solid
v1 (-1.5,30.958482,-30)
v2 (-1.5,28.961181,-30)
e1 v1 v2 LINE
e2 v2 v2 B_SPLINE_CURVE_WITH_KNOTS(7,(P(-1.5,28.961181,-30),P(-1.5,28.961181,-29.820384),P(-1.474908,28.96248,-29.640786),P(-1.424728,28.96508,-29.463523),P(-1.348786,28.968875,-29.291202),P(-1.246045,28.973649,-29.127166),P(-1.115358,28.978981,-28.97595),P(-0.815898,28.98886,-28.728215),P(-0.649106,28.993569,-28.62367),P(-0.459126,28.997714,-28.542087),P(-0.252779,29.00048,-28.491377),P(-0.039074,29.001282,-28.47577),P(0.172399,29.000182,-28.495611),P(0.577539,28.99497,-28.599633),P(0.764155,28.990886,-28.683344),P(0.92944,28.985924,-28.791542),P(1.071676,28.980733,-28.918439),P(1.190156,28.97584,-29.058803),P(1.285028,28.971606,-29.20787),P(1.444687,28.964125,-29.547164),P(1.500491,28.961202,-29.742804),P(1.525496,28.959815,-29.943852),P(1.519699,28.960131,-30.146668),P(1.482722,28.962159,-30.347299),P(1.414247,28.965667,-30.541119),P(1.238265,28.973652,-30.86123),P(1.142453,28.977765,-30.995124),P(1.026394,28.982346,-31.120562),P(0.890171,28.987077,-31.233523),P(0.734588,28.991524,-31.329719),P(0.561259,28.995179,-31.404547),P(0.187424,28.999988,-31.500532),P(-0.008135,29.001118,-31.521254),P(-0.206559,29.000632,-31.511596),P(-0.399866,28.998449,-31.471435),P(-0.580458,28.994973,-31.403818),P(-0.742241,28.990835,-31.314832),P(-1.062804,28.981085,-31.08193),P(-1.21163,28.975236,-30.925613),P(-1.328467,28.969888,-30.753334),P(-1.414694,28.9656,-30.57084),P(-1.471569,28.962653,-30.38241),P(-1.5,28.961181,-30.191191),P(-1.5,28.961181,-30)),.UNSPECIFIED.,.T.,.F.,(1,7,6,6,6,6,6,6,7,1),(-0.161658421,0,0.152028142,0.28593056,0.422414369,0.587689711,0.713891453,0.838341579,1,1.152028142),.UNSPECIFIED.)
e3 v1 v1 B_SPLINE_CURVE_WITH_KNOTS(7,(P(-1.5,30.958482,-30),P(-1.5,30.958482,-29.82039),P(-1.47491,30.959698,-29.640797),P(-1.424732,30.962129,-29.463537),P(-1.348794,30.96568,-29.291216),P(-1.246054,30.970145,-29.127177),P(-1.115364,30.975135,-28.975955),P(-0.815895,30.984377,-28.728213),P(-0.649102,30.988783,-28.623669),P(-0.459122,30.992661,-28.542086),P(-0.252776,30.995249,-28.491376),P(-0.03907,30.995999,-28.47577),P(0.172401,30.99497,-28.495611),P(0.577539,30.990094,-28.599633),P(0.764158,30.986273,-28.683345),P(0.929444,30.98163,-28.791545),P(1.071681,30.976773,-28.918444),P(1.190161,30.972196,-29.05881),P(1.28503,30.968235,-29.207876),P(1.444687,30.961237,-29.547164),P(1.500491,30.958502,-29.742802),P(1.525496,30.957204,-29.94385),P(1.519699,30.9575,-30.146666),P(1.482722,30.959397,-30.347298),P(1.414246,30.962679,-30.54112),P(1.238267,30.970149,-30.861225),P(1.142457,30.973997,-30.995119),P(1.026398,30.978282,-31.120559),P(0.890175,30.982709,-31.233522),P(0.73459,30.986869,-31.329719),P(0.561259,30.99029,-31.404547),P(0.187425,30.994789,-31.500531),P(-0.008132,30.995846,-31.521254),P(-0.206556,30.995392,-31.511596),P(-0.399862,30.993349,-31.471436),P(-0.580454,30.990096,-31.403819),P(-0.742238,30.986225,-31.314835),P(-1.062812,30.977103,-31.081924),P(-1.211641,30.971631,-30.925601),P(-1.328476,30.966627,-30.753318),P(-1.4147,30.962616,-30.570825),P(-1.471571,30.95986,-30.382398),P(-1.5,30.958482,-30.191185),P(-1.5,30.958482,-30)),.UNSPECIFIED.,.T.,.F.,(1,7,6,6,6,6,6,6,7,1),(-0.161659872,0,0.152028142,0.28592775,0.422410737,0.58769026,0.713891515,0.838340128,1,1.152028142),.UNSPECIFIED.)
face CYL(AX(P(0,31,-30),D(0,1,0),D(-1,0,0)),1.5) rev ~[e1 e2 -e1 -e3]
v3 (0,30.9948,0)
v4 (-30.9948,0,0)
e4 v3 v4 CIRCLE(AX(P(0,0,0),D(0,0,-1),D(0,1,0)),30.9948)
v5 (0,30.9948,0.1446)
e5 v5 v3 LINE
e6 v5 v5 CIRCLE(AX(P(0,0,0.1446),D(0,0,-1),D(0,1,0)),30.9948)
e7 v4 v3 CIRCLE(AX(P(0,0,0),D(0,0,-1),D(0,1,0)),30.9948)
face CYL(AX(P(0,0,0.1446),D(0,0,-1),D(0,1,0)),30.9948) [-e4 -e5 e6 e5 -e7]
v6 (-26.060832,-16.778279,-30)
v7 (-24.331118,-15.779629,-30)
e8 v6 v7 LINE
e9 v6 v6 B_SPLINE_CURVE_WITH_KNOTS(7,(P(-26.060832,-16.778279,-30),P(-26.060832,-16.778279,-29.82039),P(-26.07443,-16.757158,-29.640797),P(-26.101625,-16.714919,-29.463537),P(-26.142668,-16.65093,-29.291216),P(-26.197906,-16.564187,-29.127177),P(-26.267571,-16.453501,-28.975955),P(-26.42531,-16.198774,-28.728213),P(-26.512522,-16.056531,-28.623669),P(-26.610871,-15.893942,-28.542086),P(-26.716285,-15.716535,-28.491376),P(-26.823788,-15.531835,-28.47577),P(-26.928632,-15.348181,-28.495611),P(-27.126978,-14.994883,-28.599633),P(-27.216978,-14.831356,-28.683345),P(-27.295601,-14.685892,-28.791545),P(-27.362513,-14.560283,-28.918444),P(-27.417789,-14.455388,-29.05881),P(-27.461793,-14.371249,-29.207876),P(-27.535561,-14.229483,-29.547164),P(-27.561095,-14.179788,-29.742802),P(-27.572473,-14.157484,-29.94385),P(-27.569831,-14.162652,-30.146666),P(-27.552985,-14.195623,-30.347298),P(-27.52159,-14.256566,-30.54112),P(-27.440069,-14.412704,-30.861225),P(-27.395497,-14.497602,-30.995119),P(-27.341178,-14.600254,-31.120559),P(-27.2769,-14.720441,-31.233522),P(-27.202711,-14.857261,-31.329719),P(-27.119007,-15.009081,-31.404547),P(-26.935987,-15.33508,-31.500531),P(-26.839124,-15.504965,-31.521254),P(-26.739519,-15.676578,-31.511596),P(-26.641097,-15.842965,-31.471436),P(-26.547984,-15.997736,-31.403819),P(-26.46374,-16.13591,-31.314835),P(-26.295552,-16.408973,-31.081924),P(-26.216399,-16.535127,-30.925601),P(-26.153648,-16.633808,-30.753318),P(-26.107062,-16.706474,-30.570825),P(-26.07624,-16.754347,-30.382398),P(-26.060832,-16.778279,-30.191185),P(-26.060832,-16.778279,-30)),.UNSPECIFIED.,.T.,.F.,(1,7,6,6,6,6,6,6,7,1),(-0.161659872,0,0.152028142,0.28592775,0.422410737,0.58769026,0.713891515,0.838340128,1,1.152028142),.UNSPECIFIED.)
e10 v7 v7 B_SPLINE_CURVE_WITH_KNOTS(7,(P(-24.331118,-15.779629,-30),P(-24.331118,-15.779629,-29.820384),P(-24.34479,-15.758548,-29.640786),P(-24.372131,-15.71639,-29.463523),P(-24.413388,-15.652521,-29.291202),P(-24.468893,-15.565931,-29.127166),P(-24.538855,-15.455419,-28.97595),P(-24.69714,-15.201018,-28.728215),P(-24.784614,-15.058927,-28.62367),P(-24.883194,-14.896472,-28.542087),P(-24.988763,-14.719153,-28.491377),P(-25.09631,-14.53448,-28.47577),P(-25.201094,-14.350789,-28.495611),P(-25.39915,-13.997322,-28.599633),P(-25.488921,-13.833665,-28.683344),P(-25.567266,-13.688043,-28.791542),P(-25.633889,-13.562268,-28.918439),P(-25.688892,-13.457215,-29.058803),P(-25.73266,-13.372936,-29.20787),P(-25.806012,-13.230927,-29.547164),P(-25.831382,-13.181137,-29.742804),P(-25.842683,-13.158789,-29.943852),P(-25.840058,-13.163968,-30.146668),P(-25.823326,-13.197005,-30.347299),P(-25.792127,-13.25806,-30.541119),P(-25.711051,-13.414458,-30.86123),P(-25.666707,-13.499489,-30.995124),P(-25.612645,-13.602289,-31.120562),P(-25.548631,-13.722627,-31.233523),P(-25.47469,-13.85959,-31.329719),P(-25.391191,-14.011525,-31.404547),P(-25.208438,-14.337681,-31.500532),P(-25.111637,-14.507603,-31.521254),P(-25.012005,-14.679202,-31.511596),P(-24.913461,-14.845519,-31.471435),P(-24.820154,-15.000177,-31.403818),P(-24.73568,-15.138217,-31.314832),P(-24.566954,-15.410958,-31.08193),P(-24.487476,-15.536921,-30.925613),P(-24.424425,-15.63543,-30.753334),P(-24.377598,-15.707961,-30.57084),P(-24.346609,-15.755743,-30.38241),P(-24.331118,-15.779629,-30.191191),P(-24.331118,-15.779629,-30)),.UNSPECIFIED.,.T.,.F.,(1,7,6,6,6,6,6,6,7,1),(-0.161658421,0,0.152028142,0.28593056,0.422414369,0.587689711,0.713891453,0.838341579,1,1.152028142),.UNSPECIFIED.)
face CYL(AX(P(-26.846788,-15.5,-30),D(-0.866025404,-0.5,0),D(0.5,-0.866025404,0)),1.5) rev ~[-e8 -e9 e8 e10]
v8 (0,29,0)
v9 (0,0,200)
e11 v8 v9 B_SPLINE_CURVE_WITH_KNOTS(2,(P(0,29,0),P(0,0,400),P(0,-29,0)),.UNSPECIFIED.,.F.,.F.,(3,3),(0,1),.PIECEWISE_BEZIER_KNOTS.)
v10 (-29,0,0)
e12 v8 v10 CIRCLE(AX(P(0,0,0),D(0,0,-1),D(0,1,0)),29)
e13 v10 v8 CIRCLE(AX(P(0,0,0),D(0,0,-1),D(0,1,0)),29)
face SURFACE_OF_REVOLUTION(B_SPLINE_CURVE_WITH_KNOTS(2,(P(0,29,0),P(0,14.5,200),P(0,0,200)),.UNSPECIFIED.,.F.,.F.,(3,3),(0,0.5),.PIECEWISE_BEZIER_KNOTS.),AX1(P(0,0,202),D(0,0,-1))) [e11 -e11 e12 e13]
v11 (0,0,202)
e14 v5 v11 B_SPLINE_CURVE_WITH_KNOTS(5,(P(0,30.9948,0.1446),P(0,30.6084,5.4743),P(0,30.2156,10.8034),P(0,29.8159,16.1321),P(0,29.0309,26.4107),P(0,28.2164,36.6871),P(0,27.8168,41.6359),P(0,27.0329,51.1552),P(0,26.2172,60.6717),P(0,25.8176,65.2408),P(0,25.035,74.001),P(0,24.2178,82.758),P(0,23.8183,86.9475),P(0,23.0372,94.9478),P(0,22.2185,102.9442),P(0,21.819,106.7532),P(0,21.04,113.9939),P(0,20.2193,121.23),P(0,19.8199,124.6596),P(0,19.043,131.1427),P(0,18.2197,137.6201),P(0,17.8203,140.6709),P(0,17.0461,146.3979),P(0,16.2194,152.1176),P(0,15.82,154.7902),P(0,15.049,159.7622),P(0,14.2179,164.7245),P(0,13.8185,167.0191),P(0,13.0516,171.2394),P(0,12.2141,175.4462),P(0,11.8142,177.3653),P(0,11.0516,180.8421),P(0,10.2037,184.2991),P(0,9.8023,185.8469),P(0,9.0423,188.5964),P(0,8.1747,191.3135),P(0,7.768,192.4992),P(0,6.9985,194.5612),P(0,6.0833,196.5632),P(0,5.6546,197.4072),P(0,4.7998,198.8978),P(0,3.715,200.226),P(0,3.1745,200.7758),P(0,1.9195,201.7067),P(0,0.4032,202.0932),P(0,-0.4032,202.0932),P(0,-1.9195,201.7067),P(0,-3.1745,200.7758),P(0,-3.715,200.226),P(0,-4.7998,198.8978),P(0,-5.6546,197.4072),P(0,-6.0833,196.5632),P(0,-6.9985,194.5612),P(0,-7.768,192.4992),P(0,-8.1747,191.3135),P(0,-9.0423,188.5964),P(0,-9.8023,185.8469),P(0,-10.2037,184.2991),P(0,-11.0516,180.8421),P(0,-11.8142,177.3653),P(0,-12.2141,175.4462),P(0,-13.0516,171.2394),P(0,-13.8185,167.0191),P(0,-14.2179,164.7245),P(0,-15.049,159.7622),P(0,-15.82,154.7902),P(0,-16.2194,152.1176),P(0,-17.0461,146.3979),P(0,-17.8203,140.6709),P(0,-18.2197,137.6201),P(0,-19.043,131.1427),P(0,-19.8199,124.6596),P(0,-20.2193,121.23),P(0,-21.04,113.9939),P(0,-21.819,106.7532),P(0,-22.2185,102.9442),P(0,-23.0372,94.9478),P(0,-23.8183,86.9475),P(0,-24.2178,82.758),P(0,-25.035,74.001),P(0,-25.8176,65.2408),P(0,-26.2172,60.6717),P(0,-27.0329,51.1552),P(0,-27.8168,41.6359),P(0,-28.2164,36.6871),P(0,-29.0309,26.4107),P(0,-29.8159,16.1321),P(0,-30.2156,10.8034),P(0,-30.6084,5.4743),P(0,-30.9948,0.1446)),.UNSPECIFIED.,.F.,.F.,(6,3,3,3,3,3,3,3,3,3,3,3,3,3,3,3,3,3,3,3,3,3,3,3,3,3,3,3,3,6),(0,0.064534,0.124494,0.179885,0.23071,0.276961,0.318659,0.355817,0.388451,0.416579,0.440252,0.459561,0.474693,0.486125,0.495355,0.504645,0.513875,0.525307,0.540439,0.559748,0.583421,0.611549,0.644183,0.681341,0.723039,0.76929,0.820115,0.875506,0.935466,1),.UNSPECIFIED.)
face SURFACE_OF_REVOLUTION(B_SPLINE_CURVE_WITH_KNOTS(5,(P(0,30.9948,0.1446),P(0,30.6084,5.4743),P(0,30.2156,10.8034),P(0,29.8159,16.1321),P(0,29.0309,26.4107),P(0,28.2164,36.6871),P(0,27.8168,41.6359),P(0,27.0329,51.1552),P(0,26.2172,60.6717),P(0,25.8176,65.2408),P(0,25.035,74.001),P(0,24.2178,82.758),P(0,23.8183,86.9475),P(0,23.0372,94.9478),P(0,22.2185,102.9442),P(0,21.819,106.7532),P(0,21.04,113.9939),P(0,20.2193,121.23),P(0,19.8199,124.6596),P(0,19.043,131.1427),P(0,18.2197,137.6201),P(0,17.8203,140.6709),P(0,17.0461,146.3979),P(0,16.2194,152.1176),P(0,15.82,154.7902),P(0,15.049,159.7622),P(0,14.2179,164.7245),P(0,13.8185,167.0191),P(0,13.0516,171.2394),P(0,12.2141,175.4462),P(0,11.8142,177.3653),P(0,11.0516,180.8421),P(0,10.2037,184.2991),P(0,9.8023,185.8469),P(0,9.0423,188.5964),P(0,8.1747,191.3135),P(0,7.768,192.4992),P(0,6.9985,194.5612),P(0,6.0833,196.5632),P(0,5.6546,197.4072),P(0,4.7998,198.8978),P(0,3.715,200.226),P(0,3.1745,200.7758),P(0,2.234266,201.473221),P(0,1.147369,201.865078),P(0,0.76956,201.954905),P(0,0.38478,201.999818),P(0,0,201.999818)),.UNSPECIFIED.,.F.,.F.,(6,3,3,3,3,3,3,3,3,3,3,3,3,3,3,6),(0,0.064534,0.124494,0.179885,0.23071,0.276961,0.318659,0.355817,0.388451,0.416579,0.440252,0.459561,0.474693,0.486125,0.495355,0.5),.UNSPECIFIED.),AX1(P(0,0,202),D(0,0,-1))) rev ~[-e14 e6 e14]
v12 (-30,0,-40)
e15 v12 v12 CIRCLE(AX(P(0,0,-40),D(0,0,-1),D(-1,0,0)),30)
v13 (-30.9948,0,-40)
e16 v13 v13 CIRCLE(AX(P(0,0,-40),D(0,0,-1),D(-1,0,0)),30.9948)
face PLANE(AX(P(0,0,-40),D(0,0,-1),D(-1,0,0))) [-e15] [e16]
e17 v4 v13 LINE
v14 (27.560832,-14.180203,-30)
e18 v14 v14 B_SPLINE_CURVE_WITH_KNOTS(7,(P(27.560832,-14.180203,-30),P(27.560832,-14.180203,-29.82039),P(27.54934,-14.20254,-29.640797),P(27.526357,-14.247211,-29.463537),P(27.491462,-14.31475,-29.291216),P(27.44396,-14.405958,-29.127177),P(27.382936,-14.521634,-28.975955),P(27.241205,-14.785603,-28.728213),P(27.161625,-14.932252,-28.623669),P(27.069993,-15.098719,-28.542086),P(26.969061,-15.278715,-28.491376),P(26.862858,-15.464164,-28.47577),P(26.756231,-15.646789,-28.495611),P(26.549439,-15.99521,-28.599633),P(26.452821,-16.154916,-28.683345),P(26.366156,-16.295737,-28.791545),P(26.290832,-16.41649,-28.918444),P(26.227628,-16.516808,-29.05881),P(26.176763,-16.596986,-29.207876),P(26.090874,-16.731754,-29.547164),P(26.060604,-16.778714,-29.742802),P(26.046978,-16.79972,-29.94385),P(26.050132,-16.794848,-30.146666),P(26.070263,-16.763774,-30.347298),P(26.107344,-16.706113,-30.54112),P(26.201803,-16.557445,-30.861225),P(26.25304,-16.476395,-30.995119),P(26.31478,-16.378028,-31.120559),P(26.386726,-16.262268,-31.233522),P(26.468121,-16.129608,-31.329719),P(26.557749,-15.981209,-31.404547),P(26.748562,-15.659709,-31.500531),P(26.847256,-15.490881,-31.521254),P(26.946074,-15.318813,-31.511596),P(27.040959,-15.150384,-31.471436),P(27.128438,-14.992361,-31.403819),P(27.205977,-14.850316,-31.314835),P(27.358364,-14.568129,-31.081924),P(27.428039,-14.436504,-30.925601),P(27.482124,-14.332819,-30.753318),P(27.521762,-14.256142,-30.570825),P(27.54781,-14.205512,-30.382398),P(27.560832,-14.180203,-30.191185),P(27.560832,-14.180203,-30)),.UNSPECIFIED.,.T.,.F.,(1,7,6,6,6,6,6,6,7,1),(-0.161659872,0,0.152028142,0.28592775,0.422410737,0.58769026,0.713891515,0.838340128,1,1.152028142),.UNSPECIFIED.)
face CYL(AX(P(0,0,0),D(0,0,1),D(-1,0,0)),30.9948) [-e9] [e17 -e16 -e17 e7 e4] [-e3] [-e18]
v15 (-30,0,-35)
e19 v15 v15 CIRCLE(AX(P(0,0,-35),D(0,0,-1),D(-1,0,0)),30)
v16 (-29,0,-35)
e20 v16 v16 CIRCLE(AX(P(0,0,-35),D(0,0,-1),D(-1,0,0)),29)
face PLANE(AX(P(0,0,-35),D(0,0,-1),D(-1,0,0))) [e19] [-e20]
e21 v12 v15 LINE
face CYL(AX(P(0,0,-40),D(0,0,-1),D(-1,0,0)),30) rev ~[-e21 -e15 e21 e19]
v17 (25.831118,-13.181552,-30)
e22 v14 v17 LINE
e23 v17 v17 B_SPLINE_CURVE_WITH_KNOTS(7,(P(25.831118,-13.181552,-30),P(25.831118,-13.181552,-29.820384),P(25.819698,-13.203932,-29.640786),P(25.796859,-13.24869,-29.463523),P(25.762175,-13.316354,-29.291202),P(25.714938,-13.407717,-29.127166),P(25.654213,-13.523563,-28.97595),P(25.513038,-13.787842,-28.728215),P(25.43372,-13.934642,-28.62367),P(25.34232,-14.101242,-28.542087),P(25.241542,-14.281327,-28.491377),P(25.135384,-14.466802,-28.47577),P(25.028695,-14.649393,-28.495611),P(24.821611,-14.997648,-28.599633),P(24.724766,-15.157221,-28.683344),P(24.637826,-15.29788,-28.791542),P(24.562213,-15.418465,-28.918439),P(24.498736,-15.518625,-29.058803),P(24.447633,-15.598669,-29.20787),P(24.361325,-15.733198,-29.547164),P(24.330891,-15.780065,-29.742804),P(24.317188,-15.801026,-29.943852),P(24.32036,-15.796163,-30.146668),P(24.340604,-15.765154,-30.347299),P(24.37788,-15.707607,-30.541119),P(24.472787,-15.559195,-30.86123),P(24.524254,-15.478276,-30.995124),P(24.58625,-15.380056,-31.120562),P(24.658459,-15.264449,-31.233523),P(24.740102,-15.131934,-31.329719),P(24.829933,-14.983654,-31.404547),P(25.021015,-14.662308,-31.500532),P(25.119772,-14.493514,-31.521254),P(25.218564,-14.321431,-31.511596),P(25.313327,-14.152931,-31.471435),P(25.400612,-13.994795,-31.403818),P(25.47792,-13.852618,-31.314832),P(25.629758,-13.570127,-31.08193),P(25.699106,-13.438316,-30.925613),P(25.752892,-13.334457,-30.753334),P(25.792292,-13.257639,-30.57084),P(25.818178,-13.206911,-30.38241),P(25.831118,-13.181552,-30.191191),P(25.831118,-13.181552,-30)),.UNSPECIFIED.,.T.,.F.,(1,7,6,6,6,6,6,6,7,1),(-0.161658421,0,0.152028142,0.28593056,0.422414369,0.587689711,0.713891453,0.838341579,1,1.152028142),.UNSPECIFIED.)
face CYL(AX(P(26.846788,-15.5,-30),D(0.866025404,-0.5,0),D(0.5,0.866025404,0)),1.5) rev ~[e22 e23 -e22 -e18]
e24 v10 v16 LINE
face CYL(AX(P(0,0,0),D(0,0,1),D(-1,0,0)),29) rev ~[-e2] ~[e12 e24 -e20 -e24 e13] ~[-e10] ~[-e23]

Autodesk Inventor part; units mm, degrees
ref_plane "YZ Plane" through (0, 0, 0) normal (1, 0, 0) x (0, 1, 0)
ref_plane "XY Plane" through (0, 0, 0) normal (0, 0, 1) x (1, 0, 0)
sketch "Skizze1" plane through (0, 0, 0) normal (1, 0, 0) x (0, 1, 0)
  line L0 (0, 2094.1927) -> (0, -1699.1575) construction
  line L1 (933.6484, 0) -> (-899.755, 0) construction
  spline S0 degree 2 poles (29, 0) (0, 400) (-29, 0) knots 0 0 0 1 1 1
  line L2 (0, 90.8614) -> (0, 0)
  line L3 (0, 0) -> (44.134, 0)
  line L4 (30.9948, 0.1446) -> (30.9948, 0)
  line L5 (-30.9948, 0.1446) -> (-30.9948, 0)
  line L6 (0, 202) -> (0, 200)
  spline S1 degree 5 poles (30.9948, 0.1446) (30.6084, 5.4743) (30.2156, 10.8034) (29.8159, 16.1321) (29.0309, 26.4107) (28.2164, 36.6871) (27.8168, 41.6359) (27.0329, 51.1552) (26.2172, 60.6717) (25.8176, 65.2408) (25.035, 74.001) (24.2178, 82.758) (23.8183, 86.9475) (23.0372, 94.9478) (22.2185, 102.9442) (21.819, 106.7532) (21.04, 113.9939) (20.2193, 121.23) (19.8199, 124.6596) (19.043, 131.1427) (18.2197, 137.6201) (17.8203, 140.6709) (17.0461, 146.3979) (16.2194, 152.1176) (15.82, 154.7902) (15.049, 159.7622) (14.2179, 164.7245) (13.8185, 167.0191) (13.0516, 171.2394) (12.2141, 175.4462) (11.8142, 177.3653) (11.0516, 180.8421) (10.2037, 184.2991) (9.8023, 185.8469) (9.0423, 188.5964) (8.1747, 191.3135) (7.768, 192.4992) (6.9985, 194.5612) (6.0833, 196.5632) (5.6546, 197.4072) (4.7998, 198.8978) (3.715, 200.226) (3.1745, 200.7758) (1.9195, 201.7067) (0.4032, 202.0932) (-0.4032, 202.0932) (-1.9195, 201.7067) (-3.1745, 200.7758) (-3.715, 200.226) (-4.7998, 198.8978) (-5.6546, 197.4072) (-6.0833, 196.5632) (-6.9985, 194.5612) (-7.768, 192.4992) (-8.1747, 191.3135) (-9.0423, 188.5964) (-9.8023, 185.8469) (-10.2037, 184.2991) (-11.0516, 180.8421) (-11.8142, 177.3653) (-12.2141, 175.4462) (-13.0516, 171.2394) (-13.8185, 167.0191) (-14.2179, 164.7245) (-15.049, 159.7622) (-15.82, 154.7902) (-16.2194, 152.1176) (-17.0461, 146.3979) (-17.8203, 140.6709) (-18.2197, 137.6201) (-19.043, 131.1427) (-19.8199, 124.6596) (-20.2193, 121.23) (-21.04, 113.9939) (-21.819, 106.7532) (-22.2185, 102.9442) (-23.0372, 94.9478) (-23.8183, 86.9475) (-24.2178, 82.758) (-25.035, 74.001) (-25.8176, 65.2408) (-26.2172, 60.6717) (-27.0329, 51.1552) (-27.8168, 41.6359) (-28.2164, 36.6871) (-29.0309, 26.4107) (-29.8159, 16.1321) (-30.2156, 10.8034) (-30.6084, 5.4743) (-30.9948, 0.1446) knots 0 0 0 0 0 0 0.064534 0.064534 0.064534 0.124494 0.124494 0.124494 0.179885 0.179885 0.179885 0.23071 0.23071 0.23071 0.276961 0.276961 0.276961 0.318659 0.318659 0.318659 0.355817 0.355817 0.355817 0.388451 0.388451 0.388451 0.416579 0.416579 0.416579 0.440252 0.440252 0.440252 0.459561 0.459561 0.459561 0.474693 0.474693 0.474693 0.486125 0.486125 0.486125 0.495355 0.495355 0.495355 0.504645 0.504645 0.504645 0.513875 0.513875 0.513875 0.525307 0.525307 0.525307 0.540439 0.540439 0.540439 0.559748 0.559748 0.559748 0.583421 0.583421 0.583421 0.611549 0.611549 0.611549 0.644183 0.644183 0.644183 0.681341 0.681341 0.681341 0.723039 0.723039 0.723039 0.76929 0.76929 0.76929 0.820115 0.820115 0.820115 0.875506 0.875506 0.875506 0.935466 0.935466 0.935466 1 1 1 1 1 1
  point P0 (0, 82)
  point P1 (0, 80)
  point P2 (29, 0)
  dimension "d5" = 2
  dimension "d2" = 200
  dimension "d3" = 29
  dimension "d4" = 29
revolve "Umdrehung2" add sketch "Skizze1" angle 360 about axis through (0, 0, 90.8614) along (0, 0, -1)
sketch "Skizze2" plane through (0, 0, 0) normal (0, 0, -1) x (-1, 0, 0)
  circle A0 centre (0, 0) radius 29
  circle A1 centre (0, 0) radius 30.9948
  point P0 (0, 0)
  dimension "d17" = 58
extrude "Extrusion1" add sketch "Skizze2" along normal blind 40
sketch "Skizze5" plane through (0, 0, -40) normal (0, 0, -1) x (-1, 0, 0)
  circle A0 centre (0, 0) radius 29
  circle A1 centre (0, 0) radius 30
  dimension "d19" = 60
extrude "Extrusion3" cut sketch "Skizze5" against normal blind 5
ref_plane "Arbeitsebene3" through (0, 31, 0) normal (0, 1, 0) x (-1, 0, 0)
sketch "Skizze6" plane through (0, 31, 0) normal (0, 1, 0) x (-1, 0, 0)
  line L0 (0, -6.6699) -> (0, 5.8386) construction
  circle A0 centre (0, -30) radius 1.5
  line L1 (-30.9948, -40) -> (30.9948, -40) projected
  point P0 (0, 0)
  dimension "d23" = 3
  dimension "d24" = 10
extrude "Extrusion4" cut sketch "Skizze6" against normal blind 5
pattern_circular "Runde Anordnung3" count 3 over 360 about axis through (0, 0, -10) along (0, 0, 1) of "Extrusion4"
properties part number "_3D-Druck"
